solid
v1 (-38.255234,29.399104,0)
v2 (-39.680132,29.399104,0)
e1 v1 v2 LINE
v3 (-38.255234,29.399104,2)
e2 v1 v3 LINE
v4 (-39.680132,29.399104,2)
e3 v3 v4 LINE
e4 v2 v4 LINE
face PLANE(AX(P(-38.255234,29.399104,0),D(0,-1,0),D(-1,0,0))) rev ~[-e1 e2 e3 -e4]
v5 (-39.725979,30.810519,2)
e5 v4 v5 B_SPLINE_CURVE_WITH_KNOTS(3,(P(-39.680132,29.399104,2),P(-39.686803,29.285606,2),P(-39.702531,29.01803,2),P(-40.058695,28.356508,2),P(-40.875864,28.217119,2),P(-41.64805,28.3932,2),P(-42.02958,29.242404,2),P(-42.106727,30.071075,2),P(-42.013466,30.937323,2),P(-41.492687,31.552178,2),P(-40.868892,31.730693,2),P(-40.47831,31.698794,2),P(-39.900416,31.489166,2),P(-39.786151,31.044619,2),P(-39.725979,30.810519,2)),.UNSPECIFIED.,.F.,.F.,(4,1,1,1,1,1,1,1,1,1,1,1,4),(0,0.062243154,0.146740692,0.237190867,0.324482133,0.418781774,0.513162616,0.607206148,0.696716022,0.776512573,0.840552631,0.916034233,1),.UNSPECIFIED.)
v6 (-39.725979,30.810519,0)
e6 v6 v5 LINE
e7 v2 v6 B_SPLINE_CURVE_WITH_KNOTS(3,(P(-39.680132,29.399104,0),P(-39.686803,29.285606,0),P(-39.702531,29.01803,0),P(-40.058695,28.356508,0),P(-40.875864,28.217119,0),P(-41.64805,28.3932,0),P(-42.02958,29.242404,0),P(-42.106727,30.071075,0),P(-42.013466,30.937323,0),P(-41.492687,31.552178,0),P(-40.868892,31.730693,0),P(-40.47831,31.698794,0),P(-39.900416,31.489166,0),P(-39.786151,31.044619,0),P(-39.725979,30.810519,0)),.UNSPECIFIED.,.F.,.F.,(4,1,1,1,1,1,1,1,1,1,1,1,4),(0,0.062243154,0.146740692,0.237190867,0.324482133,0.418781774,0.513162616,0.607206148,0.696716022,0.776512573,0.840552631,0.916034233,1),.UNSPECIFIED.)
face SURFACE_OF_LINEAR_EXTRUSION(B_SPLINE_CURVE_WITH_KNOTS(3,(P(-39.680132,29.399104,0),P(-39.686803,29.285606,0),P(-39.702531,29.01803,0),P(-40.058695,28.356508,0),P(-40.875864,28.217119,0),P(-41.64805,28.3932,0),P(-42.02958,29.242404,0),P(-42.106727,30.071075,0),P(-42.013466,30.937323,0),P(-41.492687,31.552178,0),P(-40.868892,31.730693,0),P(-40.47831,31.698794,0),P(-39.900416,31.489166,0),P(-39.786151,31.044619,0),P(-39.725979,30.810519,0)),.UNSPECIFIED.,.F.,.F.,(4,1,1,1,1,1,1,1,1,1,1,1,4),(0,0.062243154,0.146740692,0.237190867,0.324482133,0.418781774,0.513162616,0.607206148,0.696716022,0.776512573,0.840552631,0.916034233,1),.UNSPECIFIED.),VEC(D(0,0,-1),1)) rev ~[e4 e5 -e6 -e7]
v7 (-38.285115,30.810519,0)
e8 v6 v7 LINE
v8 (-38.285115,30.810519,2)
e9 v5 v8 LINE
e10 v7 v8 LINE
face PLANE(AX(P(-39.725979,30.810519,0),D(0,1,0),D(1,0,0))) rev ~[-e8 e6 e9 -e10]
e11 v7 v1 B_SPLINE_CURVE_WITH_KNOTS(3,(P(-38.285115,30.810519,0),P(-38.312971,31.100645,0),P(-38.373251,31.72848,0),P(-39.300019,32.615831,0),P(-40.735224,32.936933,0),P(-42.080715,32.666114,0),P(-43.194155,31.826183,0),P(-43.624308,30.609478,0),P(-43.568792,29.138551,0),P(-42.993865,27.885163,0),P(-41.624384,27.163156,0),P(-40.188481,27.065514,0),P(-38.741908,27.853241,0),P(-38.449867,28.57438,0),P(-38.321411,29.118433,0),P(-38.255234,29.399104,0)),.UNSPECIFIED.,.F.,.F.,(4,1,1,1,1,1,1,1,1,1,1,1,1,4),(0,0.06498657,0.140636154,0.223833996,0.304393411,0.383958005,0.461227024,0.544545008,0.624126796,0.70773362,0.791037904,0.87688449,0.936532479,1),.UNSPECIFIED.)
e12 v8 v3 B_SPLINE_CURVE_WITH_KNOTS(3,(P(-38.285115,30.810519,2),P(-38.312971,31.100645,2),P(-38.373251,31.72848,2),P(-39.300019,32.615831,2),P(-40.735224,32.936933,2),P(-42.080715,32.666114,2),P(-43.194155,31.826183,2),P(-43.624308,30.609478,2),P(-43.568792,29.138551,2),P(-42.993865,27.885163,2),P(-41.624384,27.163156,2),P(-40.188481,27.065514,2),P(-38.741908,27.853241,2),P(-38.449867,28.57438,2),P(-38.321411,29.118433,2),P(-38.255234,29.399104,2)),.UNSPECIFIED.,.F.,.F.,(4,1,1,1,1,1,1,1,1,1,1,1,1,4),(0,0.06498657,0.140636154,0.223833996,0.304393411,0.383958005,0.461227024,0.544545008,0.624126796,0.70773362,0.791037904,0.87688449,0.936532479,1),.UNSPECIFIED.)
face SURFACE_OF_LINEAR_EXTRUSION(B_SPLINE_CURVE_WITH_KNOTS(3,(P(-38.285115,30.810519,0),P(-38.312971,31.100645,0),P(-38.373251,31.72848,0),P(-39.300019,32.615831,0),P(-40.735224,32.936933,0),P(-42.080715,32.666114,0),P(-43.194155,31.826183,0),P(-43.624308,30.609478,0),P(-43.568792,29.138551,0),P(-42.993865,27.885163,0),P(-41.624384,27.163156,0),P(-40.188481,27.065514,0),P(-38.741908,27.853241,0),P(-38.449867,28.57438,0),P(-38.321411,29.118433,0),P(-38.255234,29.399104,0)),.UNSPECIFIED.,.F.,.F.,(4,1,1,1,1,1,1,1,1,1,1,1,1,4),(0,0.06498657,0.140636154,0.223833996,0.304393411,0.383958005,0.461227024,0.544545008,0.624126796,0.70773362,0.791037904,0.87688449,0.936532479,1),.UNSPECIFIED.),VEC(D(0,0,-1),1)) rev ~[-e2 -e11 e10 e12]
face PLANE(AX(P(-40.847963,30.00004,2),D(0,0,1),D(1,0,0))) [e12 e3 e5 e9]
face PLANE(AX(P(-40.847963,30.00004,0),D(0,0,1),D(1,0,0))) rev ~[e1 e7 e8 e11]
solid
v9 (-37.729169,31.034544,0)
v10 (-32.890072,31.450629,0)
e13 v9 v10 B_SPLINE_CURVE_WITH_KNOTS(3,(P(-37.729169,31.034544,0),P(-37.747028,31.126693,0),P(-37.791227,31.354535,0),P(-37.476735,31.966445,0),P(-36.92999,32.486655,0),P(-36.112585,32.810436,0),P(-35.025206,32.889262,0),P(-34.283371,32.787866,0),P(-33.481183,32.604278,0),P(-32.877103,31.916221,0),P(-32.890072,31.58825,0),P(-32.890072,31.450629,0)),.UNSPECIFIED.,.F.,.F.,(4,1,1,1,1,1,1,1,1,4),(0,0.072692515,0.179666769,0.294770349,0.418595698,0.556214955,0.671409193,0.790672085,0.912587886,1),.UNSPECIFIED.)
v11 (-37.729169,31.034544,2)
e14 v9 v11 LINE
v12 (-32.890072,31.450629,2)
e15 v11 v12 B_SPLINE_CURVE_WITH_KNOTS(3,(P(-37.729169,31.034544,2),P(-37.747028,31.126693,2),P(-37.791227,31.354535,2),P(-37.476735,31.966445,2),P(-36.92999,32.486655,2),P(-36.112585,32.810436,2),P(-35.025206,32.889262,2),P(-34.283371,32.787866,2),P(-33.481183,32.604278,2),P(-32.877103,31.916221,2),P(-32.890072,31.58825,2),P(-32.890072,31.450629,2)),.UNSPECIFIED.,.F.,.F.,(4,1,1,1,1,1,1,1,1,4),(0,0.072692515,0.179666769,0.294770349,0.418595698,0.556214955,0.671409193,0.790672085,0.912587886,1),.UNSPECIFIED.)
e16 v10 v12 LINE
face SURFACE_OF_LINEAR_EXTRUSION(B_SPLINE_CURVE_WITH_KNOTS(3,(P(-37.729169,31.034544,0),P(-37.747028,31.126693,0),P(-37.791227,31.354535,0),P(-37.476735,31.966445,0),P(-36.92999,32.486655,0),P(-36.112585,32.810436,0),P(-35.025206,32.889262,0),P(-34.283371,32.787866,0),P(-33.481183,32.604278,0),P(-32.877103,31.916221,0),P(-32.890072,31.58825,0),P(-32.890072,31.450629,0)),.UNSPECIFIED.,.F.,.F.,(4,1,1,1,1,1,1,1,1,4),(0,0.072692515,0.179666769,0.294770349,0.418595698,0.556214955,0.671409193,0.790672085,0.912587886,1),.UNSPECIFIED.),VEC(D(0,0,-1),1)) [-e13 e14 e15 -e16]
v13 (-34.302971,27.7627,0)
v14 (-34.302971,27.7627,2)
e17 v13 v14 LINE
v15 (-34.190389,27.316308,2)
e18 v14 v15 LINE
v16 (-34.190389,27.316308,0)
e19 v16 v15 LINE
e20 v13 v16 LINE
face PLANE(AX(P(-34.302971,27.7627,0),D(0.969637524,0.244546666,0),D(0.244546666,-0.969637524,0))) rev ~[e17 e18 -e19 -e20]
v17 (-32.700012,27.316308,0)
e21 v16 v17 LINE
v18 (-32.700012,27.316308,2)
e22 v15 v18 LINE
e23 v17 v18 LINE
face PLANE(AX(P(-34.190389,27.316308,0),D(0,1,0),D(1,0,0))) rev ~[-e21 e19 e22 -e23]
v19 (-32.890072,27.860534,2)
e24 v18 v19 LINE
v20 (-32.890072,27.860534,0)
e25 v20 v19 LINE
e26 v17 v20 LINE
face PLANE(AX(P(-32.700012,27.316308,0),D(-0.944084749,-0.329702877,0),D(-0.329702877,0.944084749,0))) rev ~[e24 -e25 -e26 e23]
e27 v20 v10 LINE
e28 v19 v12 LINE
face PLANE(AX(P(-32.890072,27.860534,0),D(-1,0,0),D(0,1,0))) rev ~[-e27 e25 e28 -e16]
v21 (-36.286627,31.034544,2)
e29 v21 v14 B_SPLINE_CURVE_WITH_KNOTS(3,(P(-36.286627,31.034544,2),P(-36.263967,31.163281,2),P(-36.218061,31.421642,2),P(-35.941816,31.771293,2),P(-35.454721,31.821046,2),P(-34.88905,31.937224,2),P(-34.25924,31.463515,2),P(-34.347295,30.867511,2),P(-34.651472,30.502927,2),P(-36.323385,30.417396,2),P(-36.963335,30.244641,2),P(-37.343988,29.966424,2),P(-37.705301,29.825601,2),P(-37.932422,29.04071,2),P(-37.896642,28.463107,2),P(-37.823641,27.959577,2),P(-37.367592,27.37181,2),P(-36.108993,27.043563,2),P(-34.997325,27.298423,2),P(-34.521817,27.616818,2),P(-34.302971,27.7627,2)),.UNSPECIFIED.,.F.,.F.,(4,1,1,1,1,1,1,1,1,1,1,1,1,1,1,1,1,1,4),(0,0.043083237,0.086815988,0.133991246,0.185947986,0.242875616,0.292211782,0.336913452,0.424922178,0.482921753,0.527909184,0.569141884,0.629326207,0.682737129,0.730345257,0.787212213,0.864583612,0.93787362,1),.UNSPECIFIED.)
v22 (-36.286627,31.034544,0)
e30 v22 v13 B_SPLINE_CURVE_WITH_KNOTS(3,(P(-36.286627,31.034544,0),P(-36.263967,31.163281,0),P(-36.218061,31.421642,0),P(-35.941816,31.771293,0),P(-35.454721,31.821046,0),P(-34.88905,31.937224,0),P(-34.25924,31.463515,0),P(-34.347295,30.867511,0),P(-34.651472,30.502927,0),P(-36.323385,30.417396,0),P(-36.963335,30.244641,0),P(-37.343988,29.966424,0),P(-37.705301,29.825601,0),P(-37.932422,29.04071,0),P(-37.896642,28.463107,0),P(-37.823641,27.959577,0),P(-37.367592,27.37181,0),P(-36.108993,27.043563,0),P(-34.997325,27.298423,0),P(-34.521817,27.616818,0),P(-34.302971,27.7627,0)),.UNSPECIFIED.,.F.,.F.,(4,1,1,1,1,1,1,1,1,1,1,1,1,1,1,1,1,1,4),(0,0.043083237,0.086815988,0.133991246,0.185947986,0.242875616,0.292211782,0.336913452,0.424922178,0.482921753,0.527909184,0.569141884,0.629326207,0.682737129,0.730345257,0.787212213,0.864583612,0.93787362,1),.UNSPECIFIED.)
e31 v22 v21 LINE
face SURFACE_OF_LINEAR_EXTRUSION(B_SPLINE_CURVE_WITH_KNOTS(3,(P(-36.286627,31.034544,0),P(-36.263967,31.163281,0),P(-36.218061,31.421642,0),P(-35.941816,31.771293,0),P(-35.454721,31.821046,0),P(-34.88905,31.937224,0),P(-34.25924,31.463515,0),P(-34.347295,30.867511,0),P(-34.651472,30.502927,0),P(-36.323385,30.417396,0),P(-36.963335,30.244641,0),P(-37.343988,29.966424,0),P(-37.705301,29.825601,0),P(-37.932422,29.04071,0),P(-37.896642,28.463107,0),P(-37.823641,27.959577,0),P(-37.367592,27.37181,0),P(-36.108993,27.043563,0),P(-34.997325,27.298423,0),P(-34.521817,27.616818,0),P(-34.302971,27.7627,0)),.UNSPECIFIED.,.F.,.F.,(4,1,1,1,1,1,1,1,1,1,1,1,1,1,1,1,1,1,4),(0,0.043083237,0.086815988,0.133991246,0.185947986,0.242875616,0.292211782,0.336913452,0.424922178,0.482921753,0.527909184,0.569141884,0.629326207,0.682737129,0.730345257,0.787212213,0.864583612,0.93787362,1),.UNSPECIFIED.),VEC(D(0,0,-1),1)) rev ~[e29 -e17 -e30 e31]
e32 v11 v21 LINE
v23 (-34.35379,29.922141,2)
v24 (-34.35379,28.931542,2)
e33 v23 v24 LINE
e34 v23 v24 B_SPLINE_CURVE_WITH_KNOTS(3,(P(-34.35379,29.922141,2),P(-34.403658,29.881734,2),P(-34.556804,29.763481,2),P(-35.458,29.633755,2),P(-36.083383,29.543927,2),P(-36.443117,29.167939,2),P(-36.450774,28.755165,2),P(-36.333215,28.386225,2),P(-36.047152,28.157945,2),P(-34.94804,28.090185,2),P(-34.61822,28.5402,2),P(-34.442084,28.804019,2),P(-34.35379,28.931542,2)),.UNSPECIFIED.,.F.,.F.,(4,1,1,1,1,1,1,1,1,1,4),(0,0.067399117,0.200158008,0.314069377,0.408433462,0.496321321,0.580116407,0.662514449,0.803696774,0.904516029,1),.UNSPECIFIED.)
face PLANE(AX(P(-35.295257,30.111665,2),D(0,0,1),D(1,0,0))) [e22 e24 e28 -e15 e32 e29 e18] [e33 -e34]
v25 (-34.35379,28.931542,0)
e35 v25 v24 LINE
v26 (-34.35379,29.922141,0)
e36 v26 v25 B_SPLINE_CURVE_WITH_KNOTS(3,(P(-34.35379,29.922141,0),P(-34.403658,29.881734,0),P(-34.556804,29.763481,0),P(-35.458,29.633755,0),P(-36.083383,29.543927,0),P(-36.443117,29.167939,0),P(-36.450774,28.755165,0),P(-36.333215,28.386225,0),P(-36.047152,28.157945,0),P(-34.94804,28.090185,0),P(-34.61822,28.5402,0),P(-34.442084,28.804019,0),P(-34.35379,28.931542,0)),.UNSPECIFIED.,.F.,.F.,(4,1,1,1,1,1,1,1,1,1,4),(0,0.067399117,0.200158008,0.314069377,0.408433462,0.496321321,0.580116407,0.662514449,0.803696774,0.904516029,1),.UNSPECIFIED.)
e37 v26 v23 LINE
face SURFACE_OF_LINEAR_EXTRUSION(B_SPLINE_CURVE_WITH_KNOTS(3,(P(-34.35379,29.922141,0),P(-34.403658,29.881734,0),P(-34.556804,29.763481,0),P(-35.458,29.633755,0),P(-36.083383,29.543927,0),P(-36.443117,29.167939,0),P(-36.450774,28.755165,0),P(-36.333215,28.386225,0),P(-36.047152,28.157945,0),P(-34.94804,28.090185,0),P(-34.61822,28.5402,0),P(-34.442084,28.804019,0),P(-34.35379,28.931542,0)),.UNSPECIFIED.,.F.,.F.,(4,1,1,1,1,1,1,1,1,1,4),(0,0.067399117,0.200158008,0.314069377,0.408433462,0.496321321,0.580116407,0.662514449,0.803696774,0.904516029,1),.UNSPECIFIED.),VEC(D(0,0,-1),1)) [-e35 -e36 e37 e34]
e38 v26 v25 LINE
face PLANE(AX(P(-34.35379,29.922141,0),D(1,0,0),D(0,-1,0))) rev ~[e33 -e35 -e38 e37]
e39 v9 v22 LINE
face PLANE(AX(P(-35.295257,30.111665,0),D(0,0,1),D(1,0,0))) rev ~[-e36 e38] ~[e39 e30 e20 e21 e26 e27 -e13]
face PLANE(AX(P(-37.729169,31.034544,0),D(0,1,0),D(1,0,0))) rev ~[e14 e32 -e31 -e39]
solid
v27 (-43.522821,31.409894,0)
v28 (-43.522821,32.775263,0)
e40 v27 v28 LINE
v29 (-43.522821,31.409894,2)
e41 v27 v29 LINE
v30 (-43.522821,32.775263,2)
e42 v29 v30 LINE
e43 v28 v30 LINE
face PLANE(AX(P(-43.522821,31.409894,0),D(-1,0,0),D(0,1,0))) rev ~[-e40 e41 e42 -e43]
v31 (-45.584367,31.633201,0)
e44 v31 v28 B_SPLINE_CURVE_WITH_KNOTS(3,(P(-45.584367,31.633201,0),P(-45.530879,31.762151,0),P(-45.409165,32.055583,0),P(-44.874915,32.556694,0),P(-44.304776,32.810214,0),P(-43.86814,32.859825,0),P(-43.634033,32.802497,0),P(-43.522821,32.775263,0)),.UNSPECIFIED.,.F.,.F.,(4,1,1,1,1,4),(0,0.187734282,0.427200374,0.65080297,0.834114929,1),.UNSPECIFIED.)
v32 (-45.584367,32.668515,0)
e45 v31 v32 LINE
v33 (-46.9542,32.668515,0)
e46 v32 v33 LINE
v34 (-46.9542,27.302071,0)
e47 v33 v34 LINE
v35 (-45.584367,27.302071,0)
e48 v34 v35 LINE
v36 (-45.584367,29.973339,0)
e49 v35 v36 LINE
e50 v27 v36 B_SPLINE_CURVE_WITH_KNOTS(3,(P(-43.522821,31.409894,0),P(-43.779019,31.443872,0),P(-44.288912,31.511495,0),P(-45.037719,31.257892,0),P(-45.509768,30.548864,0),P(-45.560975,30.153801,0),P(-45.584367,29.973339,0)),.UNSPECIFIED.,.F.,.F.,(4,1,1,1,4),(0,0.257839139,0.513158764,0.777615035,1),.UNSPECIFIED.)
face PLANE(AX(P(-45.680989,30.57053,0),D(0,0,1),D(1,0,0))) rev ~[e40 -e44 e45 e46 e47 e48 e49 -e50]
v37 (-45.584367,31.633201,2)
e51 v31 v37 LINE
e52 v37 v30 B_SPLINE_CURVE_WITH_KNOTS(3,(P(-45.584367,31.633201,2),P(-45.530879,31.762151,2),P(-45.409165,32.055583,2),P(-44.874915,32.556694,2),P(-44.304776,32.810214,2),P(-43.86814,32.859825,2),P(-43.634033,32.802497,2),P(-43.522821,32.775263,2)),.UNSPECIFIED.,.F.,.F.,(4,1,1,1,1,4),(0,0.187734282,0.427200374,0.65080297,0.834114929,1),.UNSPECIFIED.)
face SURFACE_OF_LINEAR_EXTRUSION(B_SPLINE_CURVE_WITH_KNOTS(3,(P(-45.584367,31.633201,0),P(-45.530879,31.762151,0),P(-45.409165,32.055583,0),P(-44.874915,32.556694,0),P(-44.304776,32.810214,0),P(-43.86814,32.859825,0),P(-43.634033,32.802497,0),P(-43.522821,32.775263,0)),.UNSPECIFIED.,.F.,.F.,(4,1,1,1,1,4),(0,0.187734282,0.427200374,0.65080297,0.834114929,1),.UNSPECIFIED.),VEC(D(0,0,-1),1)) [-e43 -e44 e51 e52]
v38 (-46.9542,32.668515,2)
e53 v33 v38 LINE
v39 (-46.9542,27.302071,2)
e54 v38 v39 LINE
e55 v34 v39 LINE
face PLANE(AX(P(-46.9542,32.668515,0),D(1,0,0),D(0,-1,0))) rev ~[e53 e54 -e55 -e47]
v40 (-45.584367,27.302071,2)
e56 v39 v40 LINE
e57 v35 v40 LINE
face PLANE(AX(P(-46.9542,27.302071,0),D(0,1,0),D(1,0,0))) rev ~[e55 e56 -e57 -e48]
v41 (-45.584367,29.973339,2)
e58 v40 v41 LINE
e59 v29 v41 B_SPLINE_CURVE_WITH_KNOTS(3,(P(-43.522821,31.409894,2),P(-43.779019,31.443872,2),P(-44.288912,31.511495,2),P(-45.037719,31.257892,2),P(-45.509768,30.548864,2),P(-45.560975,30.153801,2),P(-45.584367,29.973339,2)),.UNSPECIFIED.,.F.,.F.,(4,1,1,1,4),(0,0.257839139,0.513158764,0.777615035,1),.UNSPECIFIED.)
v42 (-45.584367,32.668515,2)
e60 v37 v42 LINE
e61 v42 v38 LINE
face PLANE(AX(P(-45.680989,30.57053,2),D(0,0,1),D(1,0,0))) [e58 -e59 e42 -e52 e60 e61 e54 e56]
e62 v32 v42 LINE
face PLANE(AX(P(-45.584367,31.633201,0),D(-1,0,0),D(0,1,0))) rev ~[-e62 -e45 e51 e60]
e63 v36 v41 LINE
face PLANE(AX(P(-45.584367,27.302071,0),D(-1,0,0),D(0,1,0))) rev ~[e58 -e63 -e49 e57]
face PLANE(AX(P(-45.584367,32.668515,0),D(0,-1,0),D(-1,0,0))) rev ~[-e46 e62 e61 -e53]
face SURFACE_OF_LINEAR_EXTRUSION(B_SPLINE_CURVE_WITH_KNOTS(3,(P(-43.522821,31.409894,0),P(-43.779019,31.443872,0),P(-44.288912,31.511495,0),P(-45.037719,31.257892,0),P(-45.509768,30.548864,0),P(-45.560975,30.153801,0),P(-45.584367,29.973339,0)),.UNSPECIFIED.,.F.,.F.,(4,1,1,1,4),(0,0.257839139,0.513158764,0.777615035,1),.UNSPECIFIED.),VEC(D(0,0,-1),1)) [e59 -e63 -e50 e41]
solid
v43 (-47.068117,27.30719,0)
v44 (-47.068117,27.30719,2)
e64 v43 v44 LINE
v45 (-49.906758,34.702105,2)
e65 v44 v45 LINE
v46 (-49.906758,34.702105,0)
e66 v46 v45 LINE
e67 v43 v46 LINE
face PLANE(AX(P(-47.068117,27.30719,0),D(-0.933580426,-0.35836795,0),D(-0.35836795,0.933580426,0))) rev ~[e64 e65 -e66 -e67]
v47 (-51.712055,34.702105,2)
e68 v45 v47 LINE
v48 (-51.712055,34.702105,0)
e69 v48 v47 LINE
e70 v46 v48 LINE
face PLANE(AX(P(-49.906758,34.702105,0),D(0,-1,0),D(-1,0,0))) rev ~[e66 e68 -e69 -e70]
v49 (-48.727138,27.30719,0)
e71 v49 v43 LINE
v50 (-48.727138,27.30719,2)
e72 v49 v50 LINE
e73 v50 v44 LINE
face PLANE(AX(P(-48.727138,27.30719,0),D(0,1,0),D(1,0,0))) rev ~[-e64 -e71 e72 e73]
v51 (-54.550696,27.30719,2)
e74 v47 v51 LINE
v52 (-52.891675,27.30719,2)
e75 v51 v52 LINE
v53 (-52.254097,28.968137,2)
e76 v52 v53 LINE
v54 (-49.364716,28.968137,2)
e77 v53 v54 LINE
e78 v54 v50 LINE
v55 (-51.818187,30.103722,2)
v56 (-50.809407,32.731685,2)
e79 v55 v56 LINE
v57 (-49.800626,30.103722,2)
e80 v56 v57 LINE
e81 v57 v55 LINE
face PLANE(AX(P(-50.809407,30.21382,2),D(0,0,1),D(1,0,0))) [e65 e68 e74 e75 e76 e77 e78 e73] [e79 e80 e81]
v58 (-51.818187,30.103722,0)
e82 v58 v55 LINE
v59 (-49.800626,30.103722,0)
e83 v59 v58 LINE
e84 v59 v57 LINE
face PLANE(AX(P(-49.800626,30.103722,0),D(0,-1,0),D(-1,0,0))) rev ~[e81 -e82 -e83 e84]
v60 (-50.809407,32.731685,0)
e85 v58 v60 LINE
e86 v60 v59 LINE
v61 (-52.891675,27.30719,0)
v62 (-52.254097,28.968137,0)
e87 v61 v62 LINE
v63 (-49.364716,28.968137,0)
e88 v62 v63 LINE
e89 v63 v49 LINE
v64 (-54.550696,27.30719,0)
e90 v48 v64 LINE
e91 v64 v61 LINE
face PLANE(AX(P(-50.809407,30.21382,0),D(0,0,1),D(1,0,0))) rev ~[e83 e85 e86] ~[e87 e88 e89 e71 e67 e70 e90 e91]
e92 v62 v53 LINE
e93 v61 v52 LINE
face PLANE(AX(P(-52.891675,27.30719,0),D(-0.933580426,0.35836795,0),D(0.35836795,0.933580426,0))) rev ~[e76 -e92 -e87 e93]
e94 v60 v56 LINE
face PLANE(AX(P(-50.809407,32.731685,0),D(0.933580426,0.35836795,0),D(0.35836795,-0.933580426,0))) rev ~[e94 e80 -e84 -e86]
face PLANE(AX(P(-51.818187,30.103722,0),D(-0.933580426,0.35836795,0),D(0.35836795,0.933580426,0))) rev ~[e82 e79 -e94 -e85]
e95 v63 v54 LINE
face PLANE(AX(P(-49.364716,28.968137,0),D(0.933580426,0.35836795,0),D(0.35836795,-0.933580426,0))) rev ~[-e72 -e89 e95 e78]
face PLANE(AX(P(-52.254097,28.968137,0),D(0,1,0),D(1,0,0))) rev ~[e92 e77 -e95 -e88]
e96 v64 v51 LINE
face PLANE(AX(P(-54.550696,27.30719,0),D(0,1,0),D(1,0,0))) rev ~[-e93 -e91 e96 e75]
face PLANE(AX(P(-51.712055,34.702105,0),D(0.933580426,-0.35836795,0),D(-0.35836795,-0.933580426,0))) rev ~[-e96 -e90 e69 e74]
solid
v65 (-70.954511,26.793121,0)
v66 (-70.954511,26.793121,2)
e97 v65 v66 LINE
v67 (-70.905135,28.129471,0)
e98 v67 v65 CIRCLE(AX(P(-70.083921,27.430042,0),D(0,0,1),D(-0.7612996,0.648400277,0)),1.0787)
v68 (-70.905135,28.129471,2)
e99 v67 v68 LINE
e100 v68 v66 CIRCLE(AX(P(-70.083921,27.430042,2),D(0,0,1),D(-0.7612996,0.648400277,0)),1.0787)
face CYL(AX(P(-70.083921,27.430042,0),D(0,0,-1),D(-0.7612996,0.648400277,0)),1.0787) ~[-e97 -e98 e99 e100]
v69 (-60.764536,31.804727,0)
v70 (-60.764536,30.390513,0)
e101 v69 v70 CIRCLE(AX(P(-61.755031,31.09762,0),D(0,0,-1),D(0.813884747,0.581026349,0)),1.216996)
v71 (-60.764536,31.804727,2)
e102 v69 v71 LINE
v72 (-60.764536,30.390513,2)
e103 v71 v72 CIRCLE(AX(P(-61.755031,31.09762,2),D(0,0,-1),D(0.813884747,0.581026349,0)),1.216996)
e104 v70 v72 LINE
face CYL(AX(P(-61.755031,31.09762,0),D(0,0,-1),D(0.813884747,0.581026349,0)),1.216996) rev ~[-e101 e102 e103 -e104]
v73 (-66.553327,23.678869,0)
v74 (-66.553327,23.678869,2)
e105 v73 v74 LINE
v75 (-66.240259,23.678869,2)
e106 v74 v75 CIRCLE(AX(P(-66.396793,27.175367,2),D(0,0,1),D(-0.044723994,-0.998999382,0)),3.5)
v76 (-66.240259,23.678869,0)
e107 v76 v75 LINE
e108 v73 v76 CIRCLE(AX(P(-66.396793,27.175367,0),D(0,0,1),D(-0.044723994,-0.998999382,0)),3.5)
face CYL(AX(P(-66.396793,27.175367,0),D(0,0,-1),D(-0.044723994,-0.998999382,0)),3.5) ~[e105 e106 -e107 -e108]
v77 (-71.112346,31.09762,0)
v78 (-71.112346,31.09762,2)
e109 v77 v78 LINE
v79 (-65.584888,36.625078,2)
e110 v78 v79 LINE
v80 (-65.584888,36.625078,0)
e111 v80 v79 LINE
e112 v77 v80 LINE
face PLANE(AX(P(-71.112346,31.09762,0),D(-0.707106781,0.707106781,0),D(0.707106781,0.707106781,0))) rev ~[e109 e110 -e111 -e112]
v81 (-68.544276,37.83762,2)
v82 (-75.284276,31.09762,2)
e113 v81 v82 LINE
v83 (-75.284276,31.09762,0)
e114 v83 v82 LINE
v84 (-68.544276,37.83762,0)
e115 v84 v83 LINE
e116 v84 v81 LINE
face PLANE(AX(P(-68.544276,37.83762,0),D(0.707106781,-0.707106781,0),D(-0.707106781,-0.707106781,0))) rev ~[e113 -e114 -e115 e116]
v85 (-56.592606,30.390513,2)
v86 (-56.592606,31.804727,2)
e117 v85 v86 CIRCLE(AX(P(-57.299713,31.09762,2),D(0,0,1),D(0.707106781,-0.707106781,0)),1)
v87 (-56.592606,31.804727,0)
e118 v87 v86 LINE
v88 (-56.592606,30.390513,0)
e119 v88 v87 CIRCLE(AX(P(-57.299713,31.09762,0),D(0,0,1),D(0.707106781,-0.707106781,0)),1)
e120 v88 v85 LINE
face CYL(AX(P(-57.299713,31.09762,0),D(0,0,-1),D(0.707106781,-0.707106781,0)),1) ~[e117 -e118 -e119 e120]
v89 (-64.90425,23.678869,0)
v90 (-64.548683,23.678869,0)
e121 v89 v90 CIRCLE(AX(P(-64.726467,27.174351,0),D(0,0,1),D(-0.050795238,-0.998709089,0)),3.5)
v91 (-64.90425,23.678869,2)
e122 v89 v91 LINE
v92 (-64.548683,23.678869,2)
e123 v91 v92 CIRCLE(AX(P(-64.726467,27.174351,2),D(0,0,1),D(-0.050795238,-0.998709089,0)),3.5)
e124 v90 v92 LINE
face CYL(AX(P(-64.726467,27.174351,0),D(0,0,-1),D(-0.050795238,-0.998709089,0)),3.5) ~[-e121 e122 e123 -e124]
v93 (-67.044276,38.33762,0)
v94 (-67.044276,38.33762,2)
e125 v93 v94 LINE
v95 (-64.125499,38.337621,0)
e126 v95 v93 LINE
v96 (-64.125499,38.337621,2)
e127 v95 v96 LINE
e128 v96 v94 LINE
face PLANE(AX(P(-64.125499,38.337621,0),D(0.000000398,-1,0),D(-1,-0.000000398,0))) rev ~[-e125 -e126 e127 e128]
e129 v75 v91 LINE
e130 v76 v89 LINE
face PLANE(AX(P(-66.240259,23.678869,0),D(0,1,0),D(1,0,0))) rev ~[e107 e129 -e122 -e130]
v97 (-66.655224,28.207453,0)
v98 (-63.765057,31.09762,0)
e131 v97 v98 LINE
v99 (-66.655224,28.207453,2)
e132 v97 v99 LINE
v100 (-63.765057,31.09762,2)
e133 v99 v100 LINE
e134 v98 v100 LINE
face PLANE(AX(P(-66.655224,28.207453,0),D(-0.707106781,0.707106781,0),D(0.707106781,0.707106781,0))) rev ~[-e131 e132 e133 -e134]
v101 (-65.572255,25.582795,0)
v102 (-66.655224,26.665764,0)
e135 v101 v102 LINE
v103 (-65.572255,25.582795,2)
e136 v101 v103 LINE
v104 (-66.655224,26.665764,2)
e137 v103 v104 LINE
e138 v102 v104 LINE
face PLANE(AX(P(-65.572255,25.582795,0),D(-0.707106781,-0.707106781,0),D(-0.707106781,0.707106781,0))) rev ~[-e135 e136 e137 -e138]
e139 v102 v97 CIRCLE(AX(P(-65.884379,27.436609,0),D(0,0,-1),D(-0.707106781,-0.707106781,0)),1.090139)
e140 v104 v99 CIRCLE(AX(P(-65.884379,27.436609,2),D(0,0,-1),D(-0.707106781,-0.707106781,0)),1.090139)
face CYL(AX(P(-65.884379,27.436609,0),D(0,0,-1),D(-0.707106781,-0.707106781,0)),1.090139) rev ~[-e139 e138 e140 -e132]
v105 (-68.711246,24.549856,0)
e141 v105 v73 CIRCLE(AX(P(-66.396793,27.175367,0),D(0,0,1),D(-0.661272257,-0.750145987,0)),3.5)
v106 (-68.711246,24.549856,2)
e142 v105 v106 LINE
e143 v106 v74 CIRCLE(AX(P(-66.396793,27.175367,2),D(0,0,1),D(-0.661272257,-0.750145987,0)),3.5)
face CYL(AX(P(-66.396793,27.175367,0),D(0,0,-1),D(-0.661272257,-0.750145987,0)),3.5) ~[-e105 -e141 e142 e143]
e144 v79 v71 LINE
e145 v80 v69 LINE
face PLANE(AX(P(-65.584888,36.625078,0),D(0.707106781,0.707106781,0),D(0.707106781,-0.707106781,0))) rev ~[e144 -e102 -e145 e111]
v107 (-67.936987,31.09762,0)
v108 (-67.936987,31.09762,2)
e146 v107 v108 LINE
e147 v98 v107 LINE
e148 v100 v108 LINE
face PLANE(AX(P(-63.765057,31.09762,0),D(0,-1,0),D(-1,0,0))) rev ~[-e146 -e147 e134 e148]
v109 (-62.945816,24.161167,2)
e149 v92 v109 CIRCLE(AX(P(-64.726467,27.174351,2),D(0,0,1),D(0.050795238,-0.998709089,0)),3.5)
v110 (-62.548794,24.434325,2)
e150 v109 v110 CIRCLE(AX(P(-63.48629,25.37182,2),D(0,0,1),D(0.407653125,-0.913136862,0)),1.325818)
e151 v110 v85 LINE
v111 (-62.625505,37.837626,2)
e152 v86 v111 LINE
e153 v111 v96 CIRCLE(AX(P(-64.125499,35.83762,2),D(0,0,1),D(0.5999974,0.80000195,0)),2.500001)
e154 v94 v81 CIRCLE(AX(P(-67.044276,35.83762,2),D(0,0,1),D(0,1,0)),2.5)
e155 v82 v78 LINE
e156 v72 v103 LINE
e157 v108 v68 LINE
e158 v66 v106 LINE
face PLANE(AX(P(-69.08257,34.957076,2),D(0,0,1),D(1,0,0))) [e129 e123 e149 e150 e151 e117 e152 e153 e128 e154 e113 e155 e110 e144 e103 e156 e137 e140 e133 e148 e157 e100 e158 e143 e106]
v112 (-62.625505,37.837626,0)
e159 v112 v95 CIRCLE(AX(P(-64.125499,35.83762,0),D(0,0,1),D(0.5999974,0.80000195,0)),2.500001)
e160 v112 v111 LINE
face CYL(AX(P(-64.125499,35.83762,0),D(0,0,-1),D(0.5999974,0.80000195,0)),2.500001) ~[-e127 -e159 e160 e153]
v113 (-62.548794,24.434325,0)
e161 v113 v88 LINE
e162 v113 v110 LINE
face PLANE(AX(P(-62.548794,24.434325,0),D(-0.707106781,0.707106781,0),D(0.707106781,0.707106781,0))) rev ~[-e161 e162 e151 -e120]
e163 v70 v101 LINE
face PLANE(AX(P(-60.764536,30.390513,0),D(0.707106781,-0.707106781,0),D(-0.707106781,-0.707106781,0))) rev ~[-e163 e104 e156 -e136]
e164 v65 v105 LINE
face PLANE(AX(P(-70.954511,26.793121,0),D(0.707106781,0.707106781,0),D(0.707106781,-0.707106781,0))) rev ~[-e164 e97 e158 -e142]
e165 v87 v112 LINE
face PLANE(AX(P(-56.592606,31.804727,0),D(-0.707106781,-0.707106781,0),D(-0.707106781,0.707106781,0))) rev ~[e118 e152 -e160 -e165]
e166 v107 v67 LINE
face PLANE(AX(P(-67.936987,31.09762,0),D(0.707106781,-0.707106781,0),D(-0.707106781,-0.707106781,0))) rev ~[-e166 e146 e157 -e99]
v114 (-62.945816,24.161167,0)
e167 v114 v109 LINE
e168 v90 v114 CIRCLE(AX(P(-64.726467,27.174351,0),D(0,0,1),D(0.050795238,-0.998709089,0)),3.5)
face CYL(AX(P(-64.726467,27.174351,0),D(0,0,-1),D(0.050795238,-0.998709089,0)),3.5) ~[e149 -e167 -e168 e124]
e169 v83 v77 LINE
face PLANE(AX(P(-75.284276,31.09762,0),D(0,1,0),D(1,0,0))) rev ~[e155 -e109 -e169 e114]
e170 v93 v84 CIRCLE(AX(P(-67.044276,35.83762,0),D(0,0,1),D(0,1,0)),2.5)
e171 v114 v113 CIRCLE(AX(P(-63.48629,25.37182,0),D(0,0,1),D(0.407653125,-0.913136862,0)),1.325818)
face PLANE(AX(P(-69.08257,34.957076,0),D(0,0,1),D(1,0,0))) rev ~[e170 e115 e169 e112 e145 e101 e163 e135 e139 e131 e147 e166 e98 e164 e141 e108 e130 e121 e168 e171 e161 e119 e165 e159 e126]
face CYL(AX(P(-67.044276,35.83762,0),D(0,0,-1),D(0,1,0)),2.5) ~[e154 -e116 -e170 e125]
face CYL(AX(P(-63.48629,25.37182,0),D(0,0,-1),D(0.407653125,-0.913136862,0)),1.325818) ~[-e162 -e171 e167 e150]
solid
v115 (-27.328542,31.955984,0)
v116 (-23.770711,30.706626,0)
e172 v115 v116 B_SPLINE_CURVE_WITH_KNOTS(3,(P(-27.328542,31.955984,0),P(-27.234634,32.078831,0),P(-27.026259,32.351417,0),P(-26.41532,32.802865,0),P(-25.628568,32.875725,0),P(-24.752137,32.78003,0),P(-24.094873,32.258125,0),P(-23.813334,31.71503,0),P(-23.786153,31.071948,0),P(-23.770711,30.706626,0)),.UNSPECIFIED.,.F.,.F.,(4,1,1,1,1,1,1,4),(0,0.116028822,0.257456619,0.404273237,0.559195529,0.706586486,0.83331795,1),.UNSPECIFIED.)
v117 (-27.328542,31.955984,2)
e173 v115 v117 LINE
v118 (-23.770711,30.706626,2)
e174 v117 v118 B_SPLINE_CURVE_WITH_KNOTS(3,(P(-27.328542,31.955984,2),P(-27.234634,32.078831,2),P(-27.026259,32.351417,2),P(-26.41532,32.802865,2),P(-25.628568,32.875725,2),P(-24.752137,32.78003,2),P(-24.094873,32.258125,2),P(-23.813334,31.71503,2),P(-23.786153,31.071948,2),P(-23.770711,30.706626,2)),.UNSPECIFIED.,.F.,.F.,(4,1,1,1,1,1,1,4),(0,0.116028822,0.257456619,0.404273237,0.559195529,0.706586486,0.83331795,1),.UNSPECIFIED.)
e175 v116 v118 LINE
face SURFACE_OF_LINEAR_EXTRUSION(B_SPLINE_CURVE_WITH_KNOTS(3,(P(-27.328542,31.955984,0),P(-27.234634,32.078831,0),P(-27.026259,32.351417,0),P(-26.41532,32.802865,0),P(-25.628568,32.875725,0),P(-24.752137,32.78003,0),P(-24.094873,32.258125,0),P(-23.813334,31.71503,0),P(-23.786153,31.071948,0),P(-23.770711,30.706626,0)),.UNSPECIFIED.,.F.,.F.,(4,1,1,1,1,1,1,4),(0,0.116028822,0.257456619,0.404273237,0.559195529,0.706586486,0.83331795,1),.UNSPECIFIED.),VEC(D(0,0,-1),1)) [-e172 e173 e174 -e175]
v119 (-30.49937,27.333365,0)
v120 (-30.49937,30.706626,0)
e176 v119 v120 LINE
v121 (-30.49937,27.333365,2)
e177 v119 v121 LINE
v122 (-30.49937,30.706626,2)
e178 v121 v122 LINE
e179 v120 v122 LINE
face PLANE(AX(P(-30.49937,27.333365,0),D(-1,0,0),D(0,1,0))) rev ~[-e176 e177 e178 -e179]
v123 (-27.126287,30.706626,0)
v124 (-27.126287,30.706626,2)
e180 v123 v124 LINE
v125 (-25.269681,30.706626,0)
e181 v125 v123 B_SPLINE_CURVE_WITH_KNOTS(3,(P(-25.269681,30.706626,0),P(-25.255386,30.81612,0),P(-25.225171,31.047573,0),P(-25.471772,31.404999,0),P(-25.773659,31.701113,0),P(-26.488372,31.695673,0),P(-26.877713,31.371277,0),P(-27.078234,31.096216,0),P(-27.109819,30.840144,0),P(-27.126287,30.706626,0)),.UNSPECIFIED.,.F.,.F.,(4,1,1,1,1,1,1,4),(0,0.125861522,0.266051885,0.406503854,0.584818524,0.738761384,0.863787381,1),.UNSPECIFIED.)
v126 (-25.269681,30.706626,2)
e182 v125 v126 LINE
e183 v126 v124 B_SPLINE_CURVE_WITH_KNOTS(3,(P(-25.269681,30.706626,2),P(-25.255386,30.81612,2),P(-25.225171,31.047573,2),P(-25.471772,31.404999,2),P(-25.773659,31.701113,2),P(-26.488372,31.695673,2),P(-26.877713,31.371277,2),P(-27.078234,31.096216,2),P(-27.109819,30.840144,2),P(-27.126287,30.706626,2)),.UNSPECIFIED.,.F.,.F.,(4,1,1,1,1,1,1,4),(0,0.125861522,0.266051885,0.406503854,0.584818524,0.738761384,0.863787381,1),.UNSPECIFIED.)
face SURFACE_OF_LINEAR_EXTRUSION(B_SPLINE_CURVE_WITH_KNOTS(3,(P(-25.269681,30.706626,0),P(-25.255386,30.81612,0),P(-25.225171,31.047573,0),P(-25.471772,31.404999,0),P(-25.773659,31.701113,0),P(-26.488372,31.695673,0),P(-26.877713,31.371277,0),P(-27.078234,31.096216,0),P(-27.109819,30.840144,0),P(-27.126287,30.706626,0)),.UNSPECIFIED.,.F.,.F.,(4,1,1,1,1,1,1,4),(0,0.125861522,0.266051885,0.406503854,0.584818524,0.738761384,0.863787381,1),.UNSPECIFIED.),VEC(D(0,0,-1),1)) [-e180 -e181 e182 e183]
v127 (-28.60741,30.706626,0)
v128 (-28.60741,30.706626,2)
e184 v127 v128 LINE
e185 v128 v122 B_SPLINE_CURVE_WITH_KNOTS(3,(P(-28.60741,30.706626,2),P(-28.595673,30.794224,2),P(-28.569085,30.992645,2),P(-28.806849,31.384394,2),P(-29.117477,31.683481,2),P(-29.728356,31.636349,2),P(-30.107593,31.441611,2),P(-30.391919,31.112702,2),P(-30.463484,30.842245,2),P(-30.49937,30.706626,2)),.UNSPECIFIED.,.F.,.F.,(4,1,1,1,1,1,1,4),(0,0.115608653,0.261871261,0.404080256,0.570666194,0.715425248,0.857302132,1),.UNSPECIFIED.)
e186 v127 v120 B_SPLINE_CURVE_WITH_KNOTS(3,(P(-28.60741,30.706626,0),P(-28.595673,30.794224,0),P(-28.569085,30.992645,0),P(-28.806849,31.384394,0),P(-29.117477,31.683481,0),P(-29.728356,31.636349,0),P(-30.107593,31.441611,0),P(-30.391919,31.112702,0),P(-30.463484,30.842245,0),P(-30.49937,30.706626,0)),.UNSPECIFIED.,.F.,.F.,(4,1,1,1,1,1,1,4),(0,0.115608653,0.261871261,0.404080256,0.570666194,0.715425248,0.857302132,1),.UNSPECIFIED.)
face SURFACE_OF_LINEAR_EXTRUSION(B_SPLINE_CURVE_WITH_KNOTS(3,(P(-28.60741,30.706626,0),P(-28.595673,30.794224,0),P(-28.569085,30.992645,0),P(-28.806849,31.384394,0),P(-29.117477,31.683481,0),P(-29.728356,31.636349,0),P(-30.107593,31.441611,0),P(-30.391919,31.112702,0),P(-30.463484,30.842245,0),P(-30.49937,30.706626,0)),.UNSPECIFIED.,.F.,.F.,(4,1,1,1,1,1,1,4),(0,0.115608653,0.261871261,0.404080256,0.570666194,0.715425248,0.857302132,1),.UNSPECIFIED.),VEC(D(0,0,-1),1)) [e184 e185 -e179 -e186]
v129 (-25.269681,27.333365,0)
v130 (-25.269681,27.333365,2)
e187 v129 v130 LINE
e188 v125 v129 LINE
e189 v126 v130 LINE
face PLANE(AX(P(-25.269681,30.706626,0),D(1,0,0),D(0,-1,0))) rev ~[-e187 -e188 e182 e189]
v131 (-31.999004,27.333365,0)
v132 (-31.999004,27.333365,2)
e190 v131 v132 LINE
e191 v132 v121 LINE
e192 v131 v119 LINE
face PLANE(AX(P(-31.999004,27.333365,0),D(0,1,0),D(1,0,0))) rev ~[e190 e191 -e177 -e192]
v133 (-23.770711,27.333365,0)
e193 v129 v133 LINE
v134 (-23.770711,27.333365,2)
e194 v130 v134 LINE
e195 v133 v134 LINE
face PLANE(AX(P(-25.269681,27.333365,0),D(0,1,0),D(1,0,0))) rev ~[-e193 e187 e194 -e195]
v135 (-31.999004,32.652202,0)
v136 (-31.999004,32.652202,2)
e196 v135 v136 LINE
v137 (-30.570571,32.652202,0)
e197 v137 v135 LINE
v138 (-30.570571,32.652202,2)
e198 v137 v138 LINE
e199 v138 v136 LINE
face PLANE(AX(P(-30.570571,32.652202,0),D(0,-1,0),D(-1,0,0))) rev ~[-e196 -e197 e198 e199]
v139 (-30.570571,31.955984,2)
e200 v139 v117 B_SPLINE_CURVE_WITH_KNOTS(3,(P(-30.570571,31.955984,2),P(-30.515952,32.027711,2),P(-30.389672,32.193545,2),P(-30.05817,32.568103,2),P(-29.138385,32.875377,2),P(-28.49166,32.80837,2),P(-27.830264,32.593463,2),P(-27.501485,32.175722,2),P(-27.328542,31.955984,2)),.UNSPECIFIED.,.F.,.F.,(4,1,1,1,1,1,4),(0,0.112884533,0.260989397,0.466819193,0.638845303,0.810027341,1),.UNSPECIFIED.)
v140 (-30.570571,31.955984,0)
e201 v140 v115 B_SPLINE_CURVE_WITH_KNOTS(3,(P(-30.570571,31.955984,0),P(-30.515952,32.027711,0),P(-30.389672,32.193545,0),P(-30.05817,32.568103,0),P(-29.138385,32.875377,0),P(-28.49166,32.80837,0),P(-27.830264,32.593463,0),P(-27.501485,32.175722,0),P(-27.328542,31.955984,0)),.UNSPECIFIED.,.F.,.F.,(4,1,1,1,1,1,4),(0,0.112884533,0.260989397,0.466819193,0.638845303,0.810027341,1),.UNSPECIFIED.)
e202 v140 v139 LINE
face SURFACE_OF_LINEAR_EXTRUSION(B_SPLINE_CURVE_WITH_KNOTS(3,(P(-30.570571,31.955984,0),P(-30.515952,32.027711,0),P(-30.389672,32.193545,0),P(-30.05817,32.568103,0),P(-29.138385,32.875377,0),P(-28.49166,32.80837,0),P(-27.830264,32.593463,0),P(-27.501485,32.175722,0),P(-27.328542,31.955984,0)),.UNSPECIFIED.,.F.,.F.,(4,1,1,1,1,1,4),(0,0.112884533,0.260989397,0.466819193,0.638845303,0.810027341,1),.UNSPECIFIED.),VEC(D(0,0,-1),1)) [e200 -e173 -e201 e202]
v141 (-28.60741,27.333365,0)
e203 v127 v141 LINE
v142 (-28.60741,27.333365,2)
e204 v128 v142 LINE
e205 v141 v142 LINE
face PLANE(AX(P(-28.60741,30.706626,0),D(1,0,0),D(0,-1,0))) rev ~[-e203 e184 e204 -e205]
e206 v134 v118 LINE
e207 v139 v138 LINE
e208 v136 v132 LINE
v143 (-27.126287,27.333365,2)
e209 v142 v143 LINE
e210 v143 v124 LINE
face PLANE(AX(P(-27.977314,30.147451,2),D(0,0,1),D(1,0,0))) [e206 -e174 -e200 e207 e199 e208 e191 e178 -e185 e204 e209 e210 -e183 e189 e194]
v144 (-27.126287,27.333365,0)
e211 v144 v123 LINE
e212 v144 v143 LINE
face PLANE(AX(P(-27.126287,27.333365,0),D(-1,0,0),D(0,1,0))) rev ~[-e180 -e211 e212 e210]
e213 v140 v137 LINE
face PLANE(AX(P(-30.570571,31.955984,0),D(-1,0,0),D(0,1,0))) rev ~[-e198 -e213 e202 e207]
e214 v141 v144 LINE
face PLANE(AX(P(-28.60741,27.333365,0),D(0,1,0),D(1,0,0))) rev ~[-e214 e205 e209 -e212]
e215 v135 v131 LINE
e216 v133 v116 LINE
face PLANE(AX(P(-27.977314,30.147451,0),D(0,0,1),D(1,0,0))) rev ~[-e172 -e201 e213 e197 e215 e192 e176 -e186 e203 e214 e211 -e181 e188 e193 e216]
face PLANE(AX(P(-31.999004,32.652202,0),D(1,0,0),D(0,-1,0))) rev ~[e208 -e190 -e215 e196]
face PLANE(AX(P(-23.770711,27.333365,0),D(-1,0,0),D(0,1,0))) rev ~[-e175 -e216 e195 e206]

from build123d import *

# Parameters (mm, degrees)
F1_DEPTH = 2


# Not quite as in the source:
# - ends of sketch curves that miss each other by under 0.0002 mm in the source are joined


with BuildPart() as f1:
    # F0 (on Top) → F1 (new body)
    with BuildSketch(Plane.XY):
        with BuildLine():
            Line((-68.5442758233, 37.8376201657), (-75.2842758233, 31.0976201657))
            Line((-75.2842758233, 31.0976201657), (-71.1123458143, 31.0976201657))
            Line((-71.1123458143, 31.0976201657), (-65.5848875755, 36.6250784045))
            Line((-65.5848875755, 36.6250784045), (-64.6773347005, 37.5326312795))
            ThreePointArc((-64.6773347005, 37.5326312795), (-63.7017726464, 38.0238729513), (-62.6255051316, 37.8376259696))
            ThreePointArc((-62.6255051316, 37.8376259696), (-63.3349333998, 38.2093307968), (-64.1254993276, 38.3376213265))
            Line((-64.1254993276, 38.3376213265), (-67.0442758233, 38.3376201657))
            ThreePointArc((-67.0442758233, 38.3376201657), (-67.8348452384, 38.2093284108), (-68.5442758233, 37.8376201657))
        make_face()
        with BuildLine():
            Line((-64.6773347005, 37.5326312795), (-65.5848875755, 36.6250784045))
            Line((-65.5848875755, 36.6250784045), (-60.7645361178, 31.8047269468))
            ThreePointArc((-60.7645361178, 31.8047269468), (-60.5380345874, 31.0976201657), (-60.7645361178, 30.3905133845))
            Line((-60.7645361178, 30.3905133845), (-65.5722546007, 25.5827949015))
            Line((-65.5722546007, 25.5827949015), (-64.4237848444, 24.4343251452))
            ThreePointArc((-64.4237848444, 24.4343251452), (-63.7272467457, 24.0680817951), (-62.9458155435, 24.161166653))
            ThreePointArc((-62.9458155435, 24.161166653), (-62.7347896268, 24.2795555552), (-62.5487943481, 24.4343251452))
            Line((-62.5487943481, 24.4343251452), (-56.5926061088, 30.3905133845))
            ThreePointArc((-56.5926061088, 30.3905133845), (-56.29971289, 31.0976201657), (-56.5926061088, 31.8047269468))
            Line((-56.5926061088, 31.8047269468), (-62.6255051316, 37.8376259696))
            ThreePointArc((-62.6255051316, 37.8376259696), (-63.7017726464, 38.0238729513), (-64.6773347005, 37.5326312795))
        make_face()
        with BuildLine():
            Line((-64.4237848444, 24.4343251452), (-65.5722546007, 25.5827949015))
            Line((-65.5722546007, 25.5827949015), (-66.6552237276, 26.6657640284))
            ThreePointArc((-66.6552237276, 26.6657640284), (-66.9745179706, 27.4366085204), (-66.6552237276, 28.2074530124))
            Line((-66.6552237276, 28.2074530124), (-63.7650565743, 31.0976201657))
            Line((-63.7650565743, 31.0976201657), (-67.9369865833, 31.0976201657))
            Line((-67.9369865833, 31.0976201657), (-70.9051354279, 28.1294713211))
            ThreePointArc((-70.9051354279, 28.1294713211), (-71.1618860391, 27.4698706738), (-70.9545111372, 26.793121429))
            Line((-70.9545111372, 26.793121429), (-68.7112460172, 24.549856309))
            ThreePointArc((-68.7112460172, 24.549856309), (-67.7067925748, 23.9297700279), (-66.5533270991, 23.6788694294))
            Line((-66.5533270991, 23.6788694294), (-66.2402591376, 23.6788694294))
            Line((-66.2402591376, 23.6788694294), (-64.9042500639, 23.6788694294))
            Line((-64.9042500639, 23.6788694294), (-64.5486833954, 23.6788694294))
            ThreePointArc((-64.5486833954, 23.6788694294), (-63.7179930832, 23.8227872907), (-62.9458155435, 24.161166653))
            ThreePointArc((-62.9458155435, 24.161166653), (-63.7272467457, 24.0680817951), (-64.4237848444, 24.4343251452))
        make_face()
        with BuildLine():
            ThreePointArc((-64.9042500639, 23.6788694294), (-64.7264667296, 23.6743512397), (-64.5486833954, 23.6788694294))
            Line((-64.5486833954, 23.6788694294), (-64.9042500639, 23.6788694294))
        make_face()
        with BuildLine():
            ThreePointArc((-66.5533270991, 23.6788694294), (-66.3967931184, 23.6753672648), (-66.2402591376, 23.6788694294))
            Line((-66.2402591376, 23.6788694294), (-66.5533270991, 23.6788694294))
        make_face()
    extrude(amount=F1_DEPTH)


with BuildPart() as f1b:
    # F0 (on Top) → F1, piece 2 (new body)
    with BuildSketch(Plane.XY):
        Polygon((-51.7120547432, 34.7021047027), (-54.5506963793, 27.307190418), (-52.8916748268, 27.307190418), (-52.2540972099, 28.9681368956), (-49.3647159226, 28.9681368956), (-48.7271383057, 27.307190418), (-47.0681167532, 27.307190418), (-49.9067583893, 34.7021047027), align=None)
        Polygon((-49.8006260827, 30.103721687), (-51.8181870498, 30.103721687), (-50.8094065663, 32.7316846933), align=None, mode=Mode.SUBTRACT)
    extrude(amount=F1_DEPTH)


with BuildPart() as f1c:
    # F0 (on Top) → F1, piece 3 (new body)
    with BuildSketch(Plane.XY):
        with BuildLine():
            Line((-46.9542004939, 32.6685147129), (-46.9542004939, 27.3020714057))
            Line((-46.9542004939, 27.3020714057), (-45.5843665477, 27.3020714057))
            Line((-45.5843665477, 27.3020714057), (-45.5843665477, 29.9733391266))
            add(Edge.make_bspline(
                [(-43.5228206988, 31.4098937788), (-43.7790188564, 31.4438715653), (-44.2889116925, 31.5114951193), (-45.0377190249, 31.2578918185), (-45.509767693, 30.5488637582), (-45.5609753311, 30.153800628), (-45.5843665477, 29.9733391266)],
                knots=[0, 0, 0, 0, 0.257839139, 0.513158764, 0.777615035, 1, 1, 1, 1], degree=3))
            Line((-43.5228206988, 31.4098937788), (-43.5228206988, 32.7752627899))
            add(Edge.make_bspline(
                [(-45.5843665477, 31.6332013581), (-45.5308791384, 31.7621508466), (-45.4091654003, 32.0555829737), (-44.8749149339, 32.5566936661), (-44.3047762851, 32.8102137143), (-43.8681395106, 32.8598250997), (-43.634032553, 32.8024965546), (-43.5228206988, 32.7752627899)],
                knots=[0, 0, 0, 0, 0.1877342824, 0.4272003744, 0.6508029702, 0.8341149295, 1, 1, 1, 1], degree=3))
            Line((-45.5843665477, 31.6332013581), (-45.5843665477, 32.6685147129))
            Line((-45.5843665477, 32.6685147129), (-46.9542004939, 32.6685147129))
        make_face()
    extrude(amount=F1_DEPTH)


with BuildPart() as f1d:
    # F0 (on Top) → F1, piece 4 (new body)
    with BuildSketch(Plane.XY):
        with BuildLine():
            add(Edge.make_bspline(
                [(-39.6801316019, 29.3991039043), (-39.686803112, 29.285606014), (-39.7025314604, 29.0180302584), (-40.0586952504, 28.3565075453), (-40.8758640399, 28.2171193732), (-41.6480504786, 28.3931997992), (-42.0295799075, 29.2424037891), (-42.1067274766, 30.0710754063), (-42.0134657598, 30.937322568), (-41.4926872917, 31.5521784316), (-40.8688924084, 31.7306931298), (-40.4783101538, 31.6987941016), (-39.9004155078, 31.489165708), (-39.7861510004, 31.0446192871), (-39.7259787496, 30.8105189588)],
                knots=[0, 0, 0, 0, 0.0622431539, 0.1467406917, 0.2371908674, 0.3244821331, 0.4187817737, 0.5131626165, 0.6072061478, 0.6967160217, 0.7765125725, 0.8405526314, 0.9160342327, 1, 1, 1, 1], degree=3))
            Line((-39.7259787496, 30.8105189588), (-38.2851146933, 30.8105189588))
            add(Edge.make_bspline(
                [(-38.2851146933, 30.8105189588), (-38.3129706614, 31.1006446346), (-38.3732513436, 31.7284804208), (-39.3000192438, 32.6158305226), (-40.7352235549, 32.9369331543), (-42.0807149642, 32.6661135747), (-43.1941550306, 31.8261832119), (-43.6243075168, 30.6094778009), (-43.5687919539, 29.1385505177), (-42.9938653151, 27.8851633248), (-41.6243843874, 27.1631561296), (-40.1884811147, 27.0655135577), (-38.7419079117, 27.8532413643), (-38.4498668919, 28.5743798747), (-38.3214114992, 29.1184334886), (-38.2552341398, 29.3991039043)],
                knots=[0, 0, 0, 0, 0.0649865704, 0.1406361539, 0.2238339965, 0.3043934108, 0.3839580048, 0.4612270243, 0.5445450075, 0.6241267959, 0.7077336197, 0.7910379039, 0.8768844905, 0.9365324786, 1, 1, 1, 1], degree=3))
            Line((-38.2552341398, 29.3991039043), (-39.6801316019, 29.3991039043))
        make_face()
    extrude(amount=F1_DEPTH)


with BuildPart() as f1e:
    # F0 (on Top) → F1, piece 5 (new body)
    with BuildSketch(Plane.XY):
        with BuildLine():
            Line((-37.7291685499, 31.0345437839), (-36.2866274836, 31.0345437839))
            add(Edge.make_bspline(
                [(-36.2866274836, 31.0345437839), (-36.2639665838, 31.1632808649), (-36.2180610598, 31.4216417454), (-35.9418161151, 31.7712931723), (-35.4547206246, 31.8210455176), (-34.8890495017, 31.9372236855), (-34.2592396767, 31.463515402), (-34.3472953032, 30.8675106063), (-34.6514716049, 30.502926623), (-36.323384653, 30.4173959993), (-36.9633353247, 30.2446408368), (-37.3439883665, 29.9664238094), (-37.7053006369, 29.8256006934), (-37.9324217031, 29.040710271), (-37.8966421526, 28.4631068949), (-37.8236406423, 27.9595767044), (-37.3675917674, 27.3718102767), (-36.1089928004, 27.0435627252), (-34.9973249818, 27.2984230003), (-34.5218174602, 27.6168176867), (-34.3029709138, 27.7626998882)],
                knots=[0, 0, 0, 0, 0.0430832367, 0.0868159876, 0.1339912459, 0.1859479856, 0.2428756159, 0.2922117824, 0.3369134525, 0.4249221782, 0.4829217533, 0.5279091842, 0.5691418842, 0.6293262067, 0.6827371289, 0.730345257, 0.7872122129, 0.8645836121, 0.9378736204, 1, 1, 1, 1], degree=3))
            Line((-34.3029709138, 27.7626998882), (-34.1903889157, 27.316307665))
            Line((-34.1903889157, 27.316307665), (-32.7000120259, 27.316307665))
            Line((-32.7000120259, 27.316307665), (-32.8900722558, 27.8605339277))
            Line((-32.8900722558, 27.8605339277), (-32.8900722558, 31.4506291681))
            add(Edge.make_bspline(
                [(-37.7291685499, 31.0345437839), (-37.7470281811, 31.1266932346), (-37.7912274188, 31.3545349412), (-37.4767345128, 31.9664452879), (-36.9299903055, 32.4866545208), (-36.1125854833, 32.8104359702), (-35.0252060713, 32.8892615099), (-34.2833706877, 32.7878660836), (-33.4811828772, 32.6042775712), (-32.8771034922, 31.9162214757), (-32.8900722558, 31.5882499932), (-32.8900722558, 31.4506291681)],
                knots=[0, 0, 0, 0, 0.0726925151, 0.1796667687, 0.2947703493, 0.4185956983, 0.5562149551, 0.6714091926, 0.790672085, 0.9125878862, 1, 1, 1, 1], degree=3))
        make_face()
        with BuildLine():
            add(Edge.make_bspline(
                [(-34.3537897643, 29.922141413), (-34.4036580061, 29.8817344179), (-34.5568041392, 29.7634813159), (-35.457999965, 29.6337546115), (-36.0833828843, 29.5439273316), (-36.4431169809, 29.1679387323), (-36.4507740138, 28.7551650582), (-36.3332154987, 28.3862247952), (-36.0471524731, 28.1579445459), (-34.9480402798, 28.0901852172), (-34.6182196791, 28.5401996718), (-34.4420837444, 28.8040190114), (-34.3537897643, 28.9315419054)],
                knots=[0, 0, 0, 0, 0.0673991169, 0.2001580081, 0.3140693774, 0.4084334618, 0.4963213211, 0.580116407, 0.6625144488, 0.8036967744, 0.9045160286, 1, 1, 1, 1], degree=3))
            Line((-34.3537897643, 29.922141413), (-34.3537897643, 28.9315419054))
        make_face(mode=Mode.SUBTRACT)
    extrude(amount=F1_DEPTH)


with BuildPart() as f1f:
    # F0 (on Top) → F1, piece 6 (new body)
    with BuildSketch(Plane.XY):
        with BuildLine():
            Line((-30.4993697282, 27.3333645427), (-30.4993697282, 30.7066261421))
            add(Edge.make_bspline(
                [(-28.6074102696, 30.7066261421), (-28.5956726296, 30.7942236475), (-28.5690850817, 30.9926453809), (-28.8068489541, 31.3843936808), (-29.1174767373, 31.683481058), (-29.7283563502, 31.6363493313), (-30.1075932086, 31.4416108404), (-30.3919188743, 31.1127021721), (-30.4634839564, 30.8422449037), (-30.4993697282, 30.7066261421)],
                knots=[0, 0, 0, 0, 0.1156086525, 0.261871261, 0.4040802558, 0.5706661941, 0.715425248, 0.8573021325, 1, 1, 1, 1], degree=3))
            Line((-28.6074102696, 30.7066261421), (-28.6074102696, 27.3333645427))
            Line((-28.6074102696, 27.3333645427), (-27.126287001, 27.3333645427))
            Line((-27.126287001, 27.3333645427), (-27.126287001, 30.7066261421))
            add(Edge.make_bspline(
                [(-25.2696805473, 30.7066261421), (-25.2553864617, 30.8161199086), (-25.2251709647, 31.047572878), (-25.4717717253, 31.4049990867), (-25.773658954, 31.7011130248), (-26.4883715447, 31.6956734186), (-26.877713314, 31.3712772603), (-27.0782341365, 31.0962156803), (-27.1098185492, 30.8401444373), (-27.126287001, 30.7066261421)],
                knots=[0, 0, 0, 0, 0.1258615218, 0.2660518846, 0.4065038542, 0.584818524, 0.7387613839, 0.863787381, 1, 1, 1, 1], degree=3))
            Line((-25.2696805473, 30.7066261421), (-25.2696805473, 27.3333645427))
            Line((-25.2696805473, 27.3333645427), (-23.7707112756, 27.3333645427))
            Line((-23.7707112756, 27.3333645427), (-23.7707112756, 30.7066261421))
            add(Edge.make_bspline(
                [(-27.3285423245, 31.9559838508), (-27.234633537, 32.0788311225), (-27.0262591138, 32.3514172145), (-26.4153201488, 32.8028650006), (-25.6285680976, 32.8757245453), (-24.7521374327, 32.780029561), (-24.0948733512, 32.2581251103), (-23.8133343477, 31.7150296498), (-23.7861526351, 31.0719475595), (-23.7707112756, 30.7066261421)],
                knots=[0, 0, 0, 0, 0.1160288221, 0.2574566186, 0.4042732369, 0.5591955289, 0.7065864858, 0.8333179503, 1, 1, 1, 1], degree=3))
            add(Edge.make_bspline(
                [(-30.5705712017, 31.9559838508), (-30.5159518597, 32.0277110652), (-30.3896717682, 32.1935446118), (-30.0581701082, 32.5681032795), (-29.13838503, 32.8753772603), (-28.4916604671, 32.8083701255), (-27.8302641592, 32.593462596), (-27.5014849849, 32.1757216866), (-27.3285423245, 31.9559838508)],
                knots=[0, 0, 0, 0, 0.1128845328, 0.2609893971, 0.466819193, 0.6388453034, 0.8100273407, 1, 1, 1, 1], degree=3))
            Line((-30.5705712017, 31.9559838508), (-30.5705712017, 32.6522020159))
            Line((-30.5705712017, 32.6522020159), (-31.9990039643, 32.6522020159))
            Line((-31.9990039643, 32.6522020159), (-31.9990039643, 27.3333645427))
            Line((-31.9990039643, 27.3333645427), (-30.4993697282, 27.3333645427))
        make_face()
    extrude(amount=F1_DEPTH)


solid = Compound([f1.part, f1b.part, f1c.part, f1d.part, f1e.part, f1f.part])
